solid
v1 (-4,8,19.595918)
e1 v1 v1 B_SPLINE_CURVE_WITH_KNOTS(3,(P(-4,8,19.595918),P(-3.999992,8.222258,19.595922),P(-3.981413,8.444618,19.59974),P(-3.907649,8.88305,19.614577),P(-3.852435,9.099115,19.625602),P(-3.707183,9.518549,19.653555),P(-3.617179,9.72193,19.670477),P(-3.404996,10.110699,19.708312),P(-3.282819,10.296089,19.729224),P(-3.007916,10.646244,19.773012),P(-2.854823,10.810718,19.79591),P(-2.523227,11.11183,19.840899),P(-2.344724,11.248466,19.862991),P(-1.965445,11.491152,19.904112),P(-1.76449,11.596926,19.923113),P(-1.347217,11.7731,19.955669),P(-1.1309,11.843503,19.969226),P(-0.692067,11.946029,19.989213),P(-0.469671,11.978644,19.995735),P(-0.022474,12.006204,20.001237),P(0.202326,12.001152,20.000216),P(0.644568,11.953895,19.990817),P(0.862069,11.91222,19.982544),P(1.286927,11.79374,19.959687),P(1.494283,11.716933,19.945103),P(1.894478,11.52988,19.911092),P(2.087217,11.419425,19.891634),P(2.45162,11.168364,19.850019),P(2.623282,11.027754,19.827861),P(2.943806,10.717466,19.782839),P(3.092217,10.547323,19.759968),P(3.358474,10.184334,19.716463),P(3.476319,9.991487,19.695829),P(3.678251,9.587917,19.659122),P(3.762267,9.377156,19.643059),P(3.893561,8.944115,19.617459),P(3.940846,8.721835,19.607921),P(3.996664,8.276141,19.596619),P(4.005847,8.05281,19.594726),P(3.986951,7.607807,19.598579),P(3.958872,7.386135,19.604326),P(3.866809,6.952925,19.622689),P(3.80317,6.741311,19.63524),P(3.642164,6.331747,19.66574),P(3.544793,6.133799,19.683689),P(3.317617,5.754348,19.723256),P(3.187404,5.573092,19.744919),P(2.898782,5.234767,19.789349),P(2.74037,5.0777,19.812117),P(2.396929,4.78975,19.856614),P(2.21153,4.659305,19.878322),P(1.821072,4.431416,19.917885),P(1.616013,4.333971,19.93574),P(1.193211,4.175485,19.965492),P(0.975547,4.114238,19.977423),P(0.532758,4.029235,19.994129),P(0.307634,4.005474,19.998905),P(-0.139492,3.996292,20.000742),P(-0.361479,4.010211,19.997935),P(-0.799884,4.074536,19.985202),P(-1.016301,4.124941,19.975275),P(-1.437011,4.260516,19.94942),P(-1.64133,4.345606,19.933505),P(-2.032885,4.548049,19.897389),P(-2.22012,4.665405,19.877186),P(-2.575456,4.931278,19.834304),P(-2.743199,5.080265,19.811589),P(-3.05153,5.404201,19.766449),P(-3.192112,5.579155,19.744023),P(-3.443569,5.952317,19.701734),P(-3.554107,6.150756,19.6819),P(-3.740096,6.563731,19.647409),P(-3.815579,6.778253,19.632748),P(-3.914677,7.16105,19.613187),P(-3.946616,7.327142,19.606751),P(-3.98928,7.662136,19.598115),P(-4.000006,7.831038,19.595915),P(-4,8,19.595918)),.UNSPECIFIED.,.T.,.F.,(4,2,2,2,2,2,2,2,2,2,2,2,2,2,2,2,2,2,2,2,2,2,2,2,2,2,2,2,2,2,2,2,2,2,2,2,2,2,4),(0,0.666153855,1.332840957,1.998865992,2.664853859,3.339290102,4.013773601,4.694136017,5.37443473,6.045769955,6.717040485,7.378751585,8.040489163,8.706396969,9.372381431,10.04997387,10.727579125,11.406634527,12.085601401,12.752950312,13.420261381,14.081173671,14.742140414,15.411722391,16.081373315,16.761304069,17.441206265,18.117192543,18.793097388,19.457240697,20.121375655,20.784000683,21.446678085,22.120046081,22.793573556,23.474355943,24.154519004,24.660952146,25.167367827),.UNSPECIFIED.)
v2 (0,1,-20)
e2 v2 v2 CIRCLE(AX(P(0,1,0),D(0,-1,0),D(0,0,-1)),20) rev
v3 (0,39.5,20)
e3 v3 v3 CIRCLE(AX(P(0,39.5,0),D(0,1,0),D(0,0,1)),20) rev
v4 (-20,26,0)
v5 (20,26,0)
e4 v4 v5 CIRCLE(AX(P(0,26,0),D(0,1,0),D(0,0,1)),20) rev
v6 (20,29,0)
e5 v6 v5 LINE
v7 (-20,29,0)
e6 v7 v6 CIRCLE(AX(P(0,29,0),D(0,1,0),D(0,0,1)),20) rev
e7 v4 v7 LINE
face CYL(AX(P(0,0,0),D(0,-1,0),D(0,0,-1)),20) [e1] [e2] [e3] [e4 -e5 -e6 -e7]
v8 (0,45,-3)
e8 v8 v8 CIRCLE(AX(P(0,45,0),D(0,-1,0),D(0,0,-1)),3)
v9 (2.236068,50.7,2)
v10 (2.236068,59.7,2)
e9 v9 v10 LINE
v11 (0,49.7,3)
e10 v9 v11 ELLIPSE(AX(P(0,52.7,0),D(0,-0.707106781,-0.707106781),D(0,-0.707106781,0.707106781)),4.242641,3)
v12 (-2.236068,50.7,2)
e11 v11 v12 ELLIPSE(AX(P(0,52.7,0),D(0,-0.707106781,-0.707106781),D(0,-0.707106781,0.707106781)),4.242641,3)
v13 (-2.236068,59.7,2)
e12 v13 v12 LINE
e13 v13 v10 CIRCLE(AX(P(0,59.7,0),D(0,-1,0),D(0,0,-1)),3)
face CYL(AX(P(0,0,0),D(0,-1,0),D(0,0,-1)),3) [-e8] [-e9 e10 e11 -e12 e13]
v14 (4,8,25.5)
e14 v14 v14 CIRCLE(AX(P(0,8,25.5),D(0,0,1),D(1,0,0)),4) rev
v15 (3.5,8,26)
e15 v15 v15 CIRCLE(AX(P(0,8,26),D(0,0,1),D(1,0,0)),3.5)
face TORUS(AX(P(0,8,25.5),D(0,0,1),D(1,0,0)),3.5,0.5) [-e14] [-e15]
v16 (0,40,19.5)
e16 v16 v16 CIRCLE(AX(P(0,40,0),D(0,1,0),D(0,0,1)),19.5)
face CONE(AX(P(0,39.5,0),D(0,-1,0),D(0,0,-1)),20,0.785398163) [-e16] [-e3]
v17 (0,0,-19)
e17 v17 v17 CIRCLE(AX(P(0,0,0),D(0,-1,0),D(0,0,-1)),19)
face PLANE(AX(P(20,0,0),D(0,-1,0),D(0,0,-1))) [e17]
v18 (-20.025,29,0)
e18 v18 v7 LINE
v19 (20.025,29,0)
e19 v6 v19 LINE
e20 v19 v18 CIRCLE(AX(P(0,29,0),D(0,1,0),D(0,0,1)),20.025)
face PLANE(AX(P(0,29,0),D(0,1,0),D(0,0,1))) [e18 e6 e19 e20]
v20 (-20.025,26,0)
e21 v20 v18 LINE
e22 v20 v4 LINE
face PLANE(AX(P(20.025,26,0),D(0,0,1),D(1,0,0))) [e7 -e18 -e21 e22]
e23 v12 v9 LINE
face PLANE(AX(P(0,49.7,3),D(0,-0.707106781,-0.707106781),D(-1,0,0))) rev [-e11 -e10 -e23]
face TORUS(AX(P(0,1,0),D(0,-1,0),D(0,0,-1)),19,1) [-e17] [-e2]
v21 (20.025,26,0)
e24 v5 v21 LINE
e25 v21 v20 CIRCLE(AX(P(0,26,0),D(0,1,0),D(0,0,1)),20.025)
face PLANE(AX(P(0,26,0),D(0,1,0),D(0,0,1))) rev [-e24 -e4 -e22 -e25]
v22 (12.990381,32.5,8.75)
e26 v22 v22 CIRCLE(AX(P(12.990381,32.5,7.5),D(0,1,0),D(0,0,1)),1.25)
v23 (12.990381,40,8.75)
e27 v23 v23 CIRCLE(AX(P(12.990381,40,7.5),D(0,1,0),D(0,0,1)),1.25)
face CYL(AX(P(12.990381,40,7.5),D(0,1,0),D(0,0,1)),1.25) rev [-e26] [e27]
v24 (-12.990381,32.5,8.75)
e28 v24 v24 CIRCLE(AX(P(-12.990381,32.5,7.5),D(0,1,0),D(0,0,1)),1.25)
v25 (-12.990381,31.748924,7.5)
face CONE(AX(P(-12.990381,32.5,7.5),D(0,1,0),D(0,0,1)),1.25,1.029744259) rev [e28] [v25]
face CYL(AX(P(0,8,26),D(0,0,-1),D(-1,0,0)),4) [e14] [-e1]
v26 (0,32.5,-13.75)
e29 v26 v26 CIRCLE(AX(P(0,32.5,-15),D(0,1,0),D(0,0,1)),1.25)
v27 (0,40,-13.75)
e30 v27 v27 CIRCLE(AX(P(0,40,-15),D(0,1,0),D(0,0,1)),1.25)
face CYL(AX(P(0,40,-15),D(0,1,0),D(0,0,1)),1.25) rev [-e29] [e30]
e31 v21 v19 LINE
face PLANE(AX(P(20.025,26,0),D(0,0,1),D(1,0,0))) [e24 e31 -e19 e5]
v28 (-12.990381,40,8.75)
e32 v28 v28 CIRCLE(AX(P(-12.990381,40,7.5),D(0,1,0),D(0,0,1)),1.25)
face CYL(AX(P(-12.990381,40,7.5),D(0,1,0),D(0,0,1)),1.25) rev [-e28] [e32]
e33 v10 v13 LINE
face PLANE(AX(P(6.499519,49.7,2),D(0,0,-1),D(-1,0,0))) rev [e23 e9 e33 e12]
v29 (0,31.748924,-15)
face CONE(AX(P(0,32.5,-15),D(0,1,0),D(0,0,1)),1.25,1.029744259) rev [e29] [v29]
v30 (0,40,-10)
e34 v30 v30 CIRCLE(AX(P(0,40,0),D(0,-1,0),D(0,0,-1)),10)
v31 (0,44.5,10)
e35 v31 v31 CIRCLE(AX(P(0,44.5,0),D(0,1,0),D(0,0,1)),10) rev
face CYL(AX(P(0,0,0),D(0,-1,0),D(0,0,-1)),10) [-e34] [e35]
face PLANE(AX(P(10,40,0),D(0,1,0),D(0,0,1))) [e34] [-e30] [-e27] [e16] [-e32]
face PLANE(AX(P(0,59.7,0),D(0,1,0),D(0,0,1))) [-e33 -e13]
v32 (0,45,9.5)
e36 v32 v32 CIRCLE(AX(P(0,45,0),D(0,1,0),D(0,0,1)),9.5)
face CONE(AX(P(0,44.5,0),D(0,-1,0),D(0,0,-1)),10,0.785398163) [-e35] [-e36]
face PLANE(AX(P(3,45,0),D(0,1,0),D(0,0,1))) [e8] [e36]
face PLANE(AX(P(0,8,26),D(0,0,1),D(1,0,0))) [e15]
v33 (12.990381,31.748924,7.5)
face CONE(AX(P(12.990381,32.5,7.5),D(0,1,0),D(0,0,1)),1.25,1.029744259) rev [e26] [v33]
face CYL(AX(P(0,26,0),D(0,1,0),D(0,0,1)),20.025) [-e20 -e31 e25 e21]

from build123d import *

# Parameters (mm, degrees)
SKETCH_2_W             = 16.970483697
SKETCH_2_H             = 5.016620159
CUT_EXTRUDE_1_DEPTH    = 10
CHAMFER_1_SIZE         = 1
SKETCH_3_R             = 4
EXTRUDE_1_DEPTH        = 26
FILLET_1_R             = 1
FILLET_2_R             = 0.5
CHAMFER_2_SIZE         = 0.5
HOLE_WIZARD_M3_1_D     = 2.5
HOLE_WIZARD_M3_1_DEPTH = 7.5
HOLE_WIZARD_M3_1_TIP   = 0.751075774
EXTRUDE_2_DEPTH        = 3


with BuildPart() as part:
    # 草图1 → 旋转1 (revolve)
    with BuildSketch(Plane.XY, mode=Mode.PRIVATE) as revolve_1_sk:
        Polygon((0, 0), (0, 59.7), (3, 59.7), (3, 45), (10, 45), (10, 40), (20, 40), (20, 0), align=None)
    revolve(revolve_1_sk.sketch.rotate(Axis((0, 0, 0), (0, 1, 0)), 90), axis=Axis((0, 0, 0), (0, 1, 0)))

    # 草图2 → 切除-拉伸1 (cut)
    with BuildSketch(Plane(origin=(0, 59.7, 0), x_dir=(1, 0, 0), z_dir=(0, 1, 0))):
        with Locations((-1.985722867, -4.50831008)):
            Rectangle(SKETCH_2_W, SKETCH_2_H)
    extrude(amount=-CUT_EXTRUDE_1_DEPTH, mode=Mode.SUBTRACT)

    # 倒角1
    chamfer_1_edges = [part.edges().sort_by_distance(p)[0] for p in [
        (0, 49.7, 2),
    ]]
    chamfer(chamfer_1_edges, length=CHAMFER_1_SIZE - 0.0001)  # a hair under: the kernel refuses the full size

    # 草图3 → 凸台-拉伸1 (add)
    with BuildSketch(Plane.XY):
        with Locations(Location((0, 8, 0), (0, 0, 180))):
            Circle(SKETCH_3_R)
    extrude(amount=EXTRUDE_1_DEPTH)

    # 圆角1
    fillet_1_edges = [part.edges().sort_by_distance(p)[0] for p in [
        (0, 0, 20),
    ]]
    fillet(fillet_1_edges, radius=FILLET_1_R)

    # 圆角2
    fillet_2_edges = [part.edges().sort_by_distance(p)[0] for p in [
        (4, 8, 26),
    ]]
    fillet(fillet_2_edges, radius=FILLET_2_R)

    # 倒角2
    chamfer_2_edges = [part.edges().sort_by_distance(p)[0] for p in [
        (0, 40, 20),
        (0, 45, 10),
    ]]
    chamfer(chamfer_2_edges, length=CHAMFER_2_SIZE)

    # M3 螺纹孔1
    with Locations(Plane(origin=(0, 40, 0), x_dir=(1, 0, 0), z_dir=(0, 1, 0))):
        with Locations((-12.990381057, -7.5), (12.990381057, -7.5), (0, 15)):
            Hole(HOLE_WIZARD_M3_1_D / 2, depth=HOLE_WIZARD_M3_1_DEPTH)
            with Locations((0, 0, -(HOLE_WIZARD_M3_1_DEPTH + HOLE_WIZARD_M3_1_TIP / 2))):  # 118° drill point
                Cone(0, HOLE_WIZARD_M3_1_D / 2, HOLE_WIZARD_M3_1_TIP, mode=Mode.SUBTRACT)

    # 草图8 → 凸台-拉伸2 (add)
    with BuildSketch(Plane(origin=(0, 29, 0), x_dir=(1, 0, 0), z_dir=(0, 1, 0))):
        with BuildLine():
            Line((20.025, 0), (-20.025, 0))
            ThreePointArc((-20.025, 0), (0, 20.025), (20.025, 0))
        make_face()
    extrude(amount=-EXTRUDE_2_DEPTH)


solid = part.part
